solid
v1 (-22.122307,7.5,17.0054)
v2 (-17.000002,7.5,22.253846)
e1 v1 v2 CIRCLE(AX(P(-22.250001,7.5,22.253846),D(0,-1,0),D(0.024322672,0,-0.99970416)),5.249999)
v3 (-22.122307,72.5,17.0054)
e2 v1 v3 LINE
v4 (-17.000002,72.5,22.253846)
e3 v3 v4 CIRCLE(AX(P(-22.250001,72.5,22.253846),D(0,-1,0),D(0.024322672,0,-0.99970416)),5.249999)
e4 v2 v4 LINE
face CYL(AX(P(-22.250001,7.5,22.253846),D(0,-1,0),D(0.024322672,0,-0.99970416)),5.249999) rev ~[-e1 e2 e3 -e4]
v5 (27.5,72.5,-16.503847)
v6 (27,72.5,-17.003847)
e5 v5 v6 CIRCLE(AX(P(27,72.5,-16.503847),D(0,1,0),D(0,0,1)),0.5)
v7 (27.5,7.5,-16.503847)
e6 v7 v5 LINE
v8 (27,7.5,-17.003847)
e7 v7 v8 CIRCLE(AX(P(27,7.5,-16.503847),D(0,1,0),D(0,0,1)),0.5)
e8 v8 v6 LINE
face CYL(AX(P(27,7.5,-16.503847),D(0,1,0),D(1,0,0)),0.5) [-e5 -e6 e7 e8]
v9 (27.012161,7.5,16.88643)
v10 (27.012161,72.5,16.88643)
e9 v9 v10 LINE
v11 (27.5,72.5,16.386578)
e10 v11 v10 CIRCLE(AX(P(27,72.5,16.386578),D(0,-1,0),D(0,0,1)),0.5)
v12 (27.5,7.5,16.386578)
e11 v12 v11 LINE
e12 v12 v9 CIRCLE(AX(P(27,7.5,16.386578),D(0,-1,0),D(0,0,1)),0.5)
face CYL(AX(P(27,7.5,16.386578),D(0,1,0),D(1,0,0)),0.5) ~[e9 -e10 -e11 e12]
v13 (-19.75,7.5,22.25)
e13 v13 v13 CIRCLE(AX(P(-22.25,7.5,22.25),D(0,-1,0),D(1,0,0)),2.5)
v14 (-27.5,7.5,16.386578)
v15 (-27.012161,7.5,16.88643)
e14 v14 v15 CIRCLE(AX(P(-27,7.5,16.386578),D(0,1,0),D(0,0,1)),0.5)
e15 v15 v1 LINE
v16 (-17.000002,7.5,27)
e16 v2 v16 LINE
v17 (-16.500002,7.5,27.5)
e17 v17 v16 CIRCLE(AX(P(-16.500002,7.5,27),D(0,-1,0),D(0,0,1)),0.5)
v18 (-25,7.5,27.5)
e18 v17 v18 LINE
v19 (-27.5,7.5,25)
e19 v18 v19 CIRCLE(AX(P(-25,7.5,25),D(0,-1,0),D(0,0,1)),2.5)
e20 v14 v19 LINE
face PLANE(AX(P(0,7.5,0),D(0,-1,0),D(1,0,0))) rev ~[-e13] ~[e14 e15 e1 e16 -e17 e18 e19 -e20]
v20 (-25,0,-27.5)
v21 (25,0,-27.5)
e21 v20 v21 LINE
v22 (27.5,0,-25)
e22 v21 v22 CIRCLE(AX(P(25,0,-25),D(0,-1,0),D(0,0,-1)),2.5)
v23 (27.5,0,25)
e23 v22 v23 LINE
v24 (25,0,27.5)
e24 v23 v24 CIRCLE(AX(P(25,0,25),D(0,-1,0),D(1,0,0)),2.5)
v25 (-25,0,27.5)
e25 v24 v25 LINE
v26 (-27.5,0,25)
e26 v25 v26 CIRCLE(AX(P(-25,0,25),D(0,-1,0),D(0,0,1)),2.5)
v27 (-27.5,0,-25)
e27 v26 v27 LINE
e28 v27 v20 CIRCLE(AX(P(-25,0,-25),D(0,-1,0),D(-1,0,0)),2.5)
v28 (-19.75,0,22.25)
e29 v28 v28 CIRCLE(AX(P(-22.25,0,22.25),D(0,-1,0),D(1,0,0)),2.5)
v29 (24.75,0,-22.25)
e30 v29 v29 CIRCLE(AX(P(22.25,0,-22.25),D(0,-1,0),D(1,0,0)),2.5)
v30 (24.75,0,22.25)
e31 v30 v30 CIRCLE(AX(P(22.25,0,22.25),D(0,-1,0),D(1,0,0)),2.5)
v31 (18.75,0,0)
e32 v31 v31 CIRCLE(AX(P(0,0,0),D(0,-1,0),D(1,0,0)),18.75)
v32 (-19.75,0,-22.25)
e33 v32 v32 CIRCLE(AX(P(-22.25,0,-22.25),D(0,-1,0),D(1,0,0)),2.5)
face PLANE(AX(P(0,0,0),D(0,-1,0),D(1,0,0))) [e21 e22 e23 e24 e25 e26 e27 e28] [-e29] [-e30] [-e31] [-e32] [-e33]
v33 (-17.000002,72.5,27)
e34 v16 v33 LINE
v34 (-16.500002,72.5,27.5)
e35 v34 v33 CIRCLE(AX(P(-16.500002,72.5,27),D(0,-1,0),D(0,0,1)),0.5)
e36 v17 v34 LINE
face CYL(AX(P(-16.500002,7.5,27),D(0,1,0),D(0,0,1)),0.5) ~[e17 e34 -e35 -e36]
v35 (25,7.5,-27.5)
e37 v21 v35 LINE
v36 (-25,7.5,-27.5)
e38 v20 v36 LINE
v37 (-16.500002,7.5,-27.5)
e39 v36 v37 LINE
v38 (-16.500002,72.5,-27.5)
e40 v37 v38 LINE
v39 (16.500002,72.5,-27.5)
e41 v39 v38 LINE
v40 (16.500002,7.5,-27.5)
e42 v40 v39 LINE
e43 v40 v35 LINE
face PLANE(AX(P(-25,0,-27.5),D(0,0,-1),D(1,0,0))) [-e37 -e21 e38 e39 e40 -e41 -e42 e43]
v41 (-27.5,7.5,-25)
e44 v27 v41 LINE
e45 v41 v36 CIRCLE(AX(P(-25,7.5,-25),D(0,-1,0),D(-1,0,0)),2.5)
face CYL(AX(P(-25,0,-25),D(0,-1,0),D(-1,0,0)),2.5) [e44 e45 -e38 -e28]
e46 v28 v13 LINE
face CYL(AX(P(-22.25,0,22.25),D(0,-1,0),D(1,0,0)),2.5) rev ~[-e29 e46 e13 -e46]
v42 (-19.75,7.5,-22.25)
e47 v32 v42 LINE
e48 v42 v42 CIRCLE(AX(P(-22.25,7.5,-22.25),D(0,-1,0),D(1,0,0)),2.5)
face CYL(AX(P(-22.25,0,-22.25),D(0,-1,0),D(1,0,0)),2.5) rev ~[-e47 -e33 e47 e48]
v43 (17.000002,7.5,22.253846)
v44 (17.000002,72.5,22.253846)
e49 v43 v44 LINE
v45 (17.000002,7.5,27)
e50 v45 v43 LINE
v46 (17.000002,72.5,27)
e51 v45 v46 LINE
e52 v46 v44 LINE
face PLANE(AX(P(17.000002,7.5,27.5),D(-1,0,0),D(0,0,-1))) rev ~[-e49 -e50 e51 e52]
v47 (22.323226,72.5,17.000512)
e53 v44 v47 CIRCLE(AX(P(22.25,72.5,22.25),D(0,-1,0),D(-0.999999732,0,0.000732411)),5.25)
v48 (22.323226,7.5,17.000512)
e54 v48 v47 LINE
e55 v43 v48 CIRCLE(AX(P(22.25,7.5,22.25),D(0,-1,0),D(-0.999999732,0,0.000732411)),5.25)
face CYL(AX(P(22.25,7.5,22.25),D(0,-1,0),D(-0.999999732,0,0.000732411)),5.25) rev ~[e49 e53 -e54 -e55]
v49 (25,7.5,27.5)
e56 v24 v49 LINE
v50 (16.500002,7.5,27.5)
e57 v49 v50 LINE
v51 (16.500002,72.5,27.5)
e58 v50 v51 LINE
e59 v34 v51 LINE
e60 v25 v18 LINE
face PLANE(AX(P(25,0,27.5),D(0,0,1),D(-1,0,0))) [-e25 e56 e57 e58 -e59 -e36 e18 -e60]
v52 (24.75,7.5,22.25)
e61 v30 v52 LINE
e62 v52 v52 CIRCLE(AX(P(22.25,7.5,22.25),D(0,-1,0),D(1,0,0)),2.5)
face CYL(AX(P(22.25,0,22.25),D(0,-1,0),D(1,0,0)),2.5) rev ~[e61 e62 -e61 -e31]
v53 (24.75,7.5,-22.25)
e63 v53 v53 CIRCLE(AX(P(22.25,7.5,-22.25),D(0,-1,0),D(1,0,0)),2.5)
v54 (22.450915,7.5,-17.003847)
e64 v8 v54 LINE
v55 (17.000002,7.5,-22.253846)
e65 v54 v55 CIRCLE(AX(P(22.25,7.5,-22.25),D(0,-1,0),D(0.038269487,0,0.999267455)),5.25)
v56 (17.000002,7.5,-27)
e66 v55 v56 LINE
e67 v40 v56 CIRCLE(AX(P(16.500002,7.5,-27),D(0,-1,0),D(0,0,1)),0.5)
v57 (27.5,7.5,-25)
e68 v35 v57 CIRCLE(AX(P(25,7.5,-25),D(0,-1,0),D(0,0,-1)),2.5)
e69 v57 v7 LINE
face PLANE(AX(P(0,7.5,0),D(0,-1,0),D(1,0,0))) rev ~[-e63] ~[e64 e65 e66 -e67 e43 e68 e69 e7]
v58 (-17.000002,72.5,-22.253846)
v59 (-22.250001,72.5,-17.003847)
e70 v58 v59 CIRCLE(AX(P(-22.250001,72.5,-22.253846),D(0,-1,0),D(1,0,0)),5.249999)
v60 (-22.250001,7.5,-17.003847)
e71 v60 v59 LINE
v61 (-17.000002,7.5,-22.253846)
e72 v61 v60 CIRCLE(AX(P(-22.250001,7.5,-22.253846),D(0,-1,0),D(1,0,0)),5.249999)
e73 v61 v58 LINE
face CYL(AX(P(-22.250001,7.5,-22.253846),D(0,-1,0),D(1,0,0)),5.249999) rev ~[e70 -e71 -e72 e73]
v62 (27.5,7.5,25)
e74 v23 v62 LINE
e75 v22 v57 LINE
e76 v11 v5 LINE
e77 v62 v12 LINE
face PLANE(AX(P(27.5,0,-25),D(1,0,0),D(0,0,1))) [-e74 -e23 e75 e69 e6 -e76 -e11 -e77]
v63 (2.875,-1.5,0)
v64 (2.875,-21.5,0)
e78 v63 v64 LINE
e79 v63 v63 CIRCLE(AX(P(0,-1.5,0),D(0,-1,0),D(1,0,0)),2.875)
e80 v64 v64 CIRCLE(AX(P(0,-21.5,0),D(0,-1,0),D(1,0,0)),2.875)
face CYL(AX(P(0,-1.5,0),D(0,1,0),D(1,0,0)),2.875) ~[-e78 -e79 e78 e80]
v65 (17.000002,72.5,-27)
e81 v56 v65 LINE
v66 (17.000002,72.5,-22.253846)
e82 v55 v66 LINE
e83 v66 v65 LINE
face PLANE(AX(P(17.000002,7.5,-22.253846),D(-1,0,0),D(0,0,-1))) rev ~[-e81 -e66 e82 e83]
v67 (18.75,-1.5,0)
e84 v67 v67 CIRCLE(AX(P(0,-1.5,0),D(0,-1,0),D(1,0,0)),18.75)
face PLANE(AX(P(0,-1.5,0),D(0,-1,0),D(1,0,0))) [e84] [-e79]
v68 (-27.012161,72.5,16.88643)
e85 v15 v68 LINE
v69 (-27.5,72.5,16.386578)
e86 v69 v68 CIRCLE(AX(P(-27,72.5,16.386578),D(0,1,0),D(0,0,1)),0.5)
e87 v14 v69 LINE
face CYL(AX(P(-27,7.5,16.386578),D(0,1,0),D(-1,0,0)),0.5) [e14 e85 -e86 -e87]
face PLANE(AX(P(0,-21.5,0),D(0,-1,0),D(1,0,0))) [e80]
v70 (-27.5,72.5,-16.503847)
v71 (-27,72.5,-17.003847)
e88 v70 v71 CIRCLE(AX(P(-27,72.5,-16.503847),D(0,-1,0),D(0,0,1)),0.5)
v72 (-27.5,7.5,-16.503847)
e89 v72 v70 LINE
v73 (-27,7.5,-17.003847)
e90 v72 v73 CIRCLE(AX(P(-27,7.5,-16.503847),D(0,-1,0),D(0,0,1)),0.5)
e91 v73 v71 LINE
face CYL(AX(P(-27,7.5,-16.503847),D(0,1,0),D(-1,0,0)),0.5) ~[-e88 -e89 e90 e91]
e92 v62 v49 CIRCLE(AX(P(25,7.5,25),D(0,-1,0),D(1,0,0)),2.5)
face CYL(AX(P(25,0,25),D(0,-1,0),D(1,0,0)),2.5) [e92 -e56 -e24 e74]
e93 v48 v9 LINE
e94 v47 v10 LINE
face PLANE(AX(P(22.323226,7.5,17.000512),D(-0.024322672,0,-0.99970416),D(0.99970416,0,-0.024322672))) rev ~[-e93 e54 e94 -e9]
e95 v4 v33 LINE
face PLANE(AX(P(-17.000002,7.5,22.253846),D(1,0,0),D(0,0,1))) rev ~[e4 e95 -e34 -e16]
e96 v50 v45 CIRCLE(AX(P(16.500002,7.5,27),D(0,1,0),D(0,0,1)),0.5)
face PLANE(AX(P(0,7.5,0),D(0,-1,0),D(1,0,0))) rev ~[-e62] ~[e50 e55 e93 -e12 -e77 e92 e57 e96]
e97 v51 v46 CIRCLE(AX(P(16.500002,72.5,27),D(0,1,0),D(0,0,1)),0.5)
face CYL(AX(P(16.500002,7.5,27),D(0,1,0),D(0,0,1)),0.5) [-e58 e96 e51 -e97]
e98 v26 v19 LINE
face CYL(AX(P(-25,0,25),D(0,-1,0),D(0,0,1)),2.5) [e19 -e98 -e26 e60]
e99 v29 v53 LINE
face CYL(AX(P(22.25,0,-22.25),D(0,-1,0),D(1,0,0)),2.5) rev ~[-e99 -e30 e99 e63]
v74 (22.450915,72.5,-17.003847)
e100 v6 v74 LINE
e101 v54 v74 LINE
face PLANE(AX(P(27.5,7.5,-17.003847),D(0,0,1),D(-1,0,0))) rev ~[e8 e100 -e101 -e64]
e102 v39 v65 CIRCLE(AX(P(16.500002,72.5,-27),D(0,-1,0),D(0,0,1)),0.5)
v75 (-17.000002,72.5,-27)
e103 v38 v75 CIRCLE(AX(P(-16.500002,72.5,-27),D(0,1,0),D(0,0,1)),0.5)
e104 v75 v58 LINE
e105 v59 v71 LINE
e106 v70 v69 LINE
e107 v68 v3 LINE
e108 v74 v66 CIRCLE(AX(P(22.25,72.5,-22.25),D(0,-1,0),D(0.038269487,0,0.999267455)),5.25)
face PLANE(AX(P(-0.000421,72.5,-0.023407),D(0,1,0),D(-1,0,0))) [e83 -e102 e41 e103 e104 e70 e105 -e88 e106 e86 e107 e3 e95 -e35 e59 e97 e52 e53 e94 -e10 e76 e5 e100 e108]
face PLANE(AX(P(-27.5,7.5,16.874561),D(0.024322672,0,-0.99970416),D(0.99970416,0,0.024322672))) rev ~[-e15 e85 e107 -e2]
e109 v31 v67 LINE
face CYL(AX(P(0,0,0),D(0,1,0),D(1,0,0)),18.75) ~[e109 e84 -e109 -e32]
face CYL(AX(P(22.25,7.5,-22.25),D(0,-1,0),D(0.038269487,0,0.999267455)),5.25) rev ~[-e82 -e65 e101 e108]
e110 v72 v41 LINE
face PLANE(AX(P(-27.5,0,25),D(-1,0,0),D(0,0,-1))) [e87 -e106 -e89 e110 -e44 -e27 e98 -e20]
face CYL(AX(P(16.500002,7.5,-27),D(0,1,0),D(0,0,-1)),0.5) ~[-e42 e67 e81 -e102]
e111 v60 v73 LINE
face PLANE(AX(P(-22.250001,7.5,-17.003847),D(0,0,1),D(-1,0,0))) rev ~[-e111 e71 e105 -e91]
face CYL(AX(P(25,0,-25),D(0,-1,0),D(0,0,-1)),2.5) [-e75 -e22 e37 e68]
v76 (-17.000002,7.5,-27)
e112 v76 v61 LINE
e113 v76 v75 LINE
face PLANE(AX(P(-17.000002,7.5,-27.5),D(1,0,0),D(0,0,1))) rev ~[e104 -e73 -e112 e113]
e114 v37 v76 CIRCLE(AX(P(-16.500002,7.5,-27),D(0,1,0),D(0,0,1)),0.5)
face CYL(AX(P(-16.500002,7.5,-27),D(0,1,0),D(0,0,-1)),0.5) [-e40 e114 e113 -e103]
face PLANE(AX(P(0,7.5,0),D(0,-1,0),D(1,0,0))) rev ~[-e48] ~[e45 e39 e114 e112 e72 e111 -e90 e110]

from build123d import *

# Parameters (mm, degrees)
F0_R     = 18.75
F1_DEPTH = 1.5
F0_R_2   = 2.5
F2_DEPTH = 7.5
F4_DEPTH = 65
F5_R     = 0.5
F6_R     = 2.875
F7_DEPTH = 20


with BuildPart() as f1:
    # F0 (on Front) → F1 (new body)
    with BuildSketch(Plane.XZ):
        Circle(F0_R)
    extrude(amount=F1_DEPTH)

    # F0 (on Front) → F2 (join)
    with BuildSketch(Plane.XZ):
        with BuildLine():
            Line((25, 27.5), (-25, 27.5))
            ThreePointArc((-25, 27.5), (-26.767766953, 26.767766953), (-27.5, 25))
            Line((-27.5, 25), (-27.5, -25))
            ThreePointArc((-27.5, -25), (-26.767766953, -26.767766953), (-25, -27.5))
            Line((-25, -27.5), (25, -27.5))
            ThreePointArc((25, -27.5), (26.767766953, -26.767766953), (27.5, -25))
            Line((27.5, -25), (27.5, 25))
            ThreePointArc((27.5, 25), (26.767766953, 26.767766953), (25, 27.5))
        make_face()
        with Locations((-22.25, -22.25)):
            Circle(F0_R_2, mode=Mode.SUBTRACT)
        with Locations((22.25, -22.25)):
            Circle(F0_R_2, mode=Mode.SUBTRACT)
        with Locations((-22.25, 22.25)):
            Circle(F0_R_2, mode=Mode.SUBTRACT)
        Circle(F0_R, mode=Mode.SUBTRACT)
        with Locations((22.25, 22.25)):
            Circle(F0_R_2, mode=Mode.SUBTRACT)
        Circle(F0_R)
    extrude(amount=-F2_DEPTH)

    # F3 (on face) → F4 (join)
    with BuildSketch(Plane(origin=(0, 7.5, 0), x_dir=(-1, 0, 0), z_dir=(0, 1, 0))):
        with BuildLine():
            Line((27.5, -17.0038467285), (27.5, 16.874561323))
            Line((27.5, 16.874561323), (22.1223071391, 17.0053998878))
            ThreePointArc((22.1223071391, 17.0053998878), (18.4928159277, 18.5869603521), (17.000002275, 22.253845591))
            Line((17.000002275, 22.253845591), (17.000002275, 27.5))
            Line((17.000002275, 27.5), (-17.000002275, 27.5))
            Line((-17.000002275, 27.5), (-17.000002275, 22.253845591))
            ThreePointArc((-17.000002275, 22.253845591), (-18.5623015375, 18.5132408344), (-22.3232260335, 17.0005115574))
            Line((-22.3232260335, 17.0005115574), (-27.5, 16.874561323))
            Line((-27.5, 16.874561323), (-27.5, -17.0038467285))
            Line((-27.5, -17.0038467285), (-22.4509152226, -17.0038467285))
            ThreePointArc((-22.4509152226, -17.0038467285), (-18.6080321838, -18.4686563976), (-17.000002275, -22.253845591))
            Line((-17.000002275, -22.253845591), (-17.000002275, -27.5))
            Line((-17.000002275, -27.5), (17.000002275, -27.5))
            Line((17.000002275, -27.5), (17.000002275, -22.253845591))
            ThreePointArc((17.000002275, -22.253845591), (18.5376913406, -18.5415357941), (22.2500011375, -17.0038467285))
            Line((22.2500011375, -17.0038467285), (27.5, -17.0038467285))
        make_face()
    extrude(amount=F4_DEPTH)

    # F5
    f5_edges = [f1.edges().sort_by_distance(p)[0] for p in [
        (17.000002, 40, 27.5),
        (-17.000002, 40, 27.5),
        (27.5, 40, -17.003847),
        (27.5, 40, 16.874561),
        (-27.5, 40, 16.874561),
        (-27.5, 40, -17.003847),
        (-17.000002, 40, -27.5),
        (17.000002, 40, -27.5),
    ]]
    fillet(f5_edges, radius=F5_R)

    # F6 (on face) → F7 (join)
    with BuildSketch(Plane.XZ.offset(1.5)):
        Circle(F6_R)
    extrude(amount=F7_DEPTH)


solid = f1.part
